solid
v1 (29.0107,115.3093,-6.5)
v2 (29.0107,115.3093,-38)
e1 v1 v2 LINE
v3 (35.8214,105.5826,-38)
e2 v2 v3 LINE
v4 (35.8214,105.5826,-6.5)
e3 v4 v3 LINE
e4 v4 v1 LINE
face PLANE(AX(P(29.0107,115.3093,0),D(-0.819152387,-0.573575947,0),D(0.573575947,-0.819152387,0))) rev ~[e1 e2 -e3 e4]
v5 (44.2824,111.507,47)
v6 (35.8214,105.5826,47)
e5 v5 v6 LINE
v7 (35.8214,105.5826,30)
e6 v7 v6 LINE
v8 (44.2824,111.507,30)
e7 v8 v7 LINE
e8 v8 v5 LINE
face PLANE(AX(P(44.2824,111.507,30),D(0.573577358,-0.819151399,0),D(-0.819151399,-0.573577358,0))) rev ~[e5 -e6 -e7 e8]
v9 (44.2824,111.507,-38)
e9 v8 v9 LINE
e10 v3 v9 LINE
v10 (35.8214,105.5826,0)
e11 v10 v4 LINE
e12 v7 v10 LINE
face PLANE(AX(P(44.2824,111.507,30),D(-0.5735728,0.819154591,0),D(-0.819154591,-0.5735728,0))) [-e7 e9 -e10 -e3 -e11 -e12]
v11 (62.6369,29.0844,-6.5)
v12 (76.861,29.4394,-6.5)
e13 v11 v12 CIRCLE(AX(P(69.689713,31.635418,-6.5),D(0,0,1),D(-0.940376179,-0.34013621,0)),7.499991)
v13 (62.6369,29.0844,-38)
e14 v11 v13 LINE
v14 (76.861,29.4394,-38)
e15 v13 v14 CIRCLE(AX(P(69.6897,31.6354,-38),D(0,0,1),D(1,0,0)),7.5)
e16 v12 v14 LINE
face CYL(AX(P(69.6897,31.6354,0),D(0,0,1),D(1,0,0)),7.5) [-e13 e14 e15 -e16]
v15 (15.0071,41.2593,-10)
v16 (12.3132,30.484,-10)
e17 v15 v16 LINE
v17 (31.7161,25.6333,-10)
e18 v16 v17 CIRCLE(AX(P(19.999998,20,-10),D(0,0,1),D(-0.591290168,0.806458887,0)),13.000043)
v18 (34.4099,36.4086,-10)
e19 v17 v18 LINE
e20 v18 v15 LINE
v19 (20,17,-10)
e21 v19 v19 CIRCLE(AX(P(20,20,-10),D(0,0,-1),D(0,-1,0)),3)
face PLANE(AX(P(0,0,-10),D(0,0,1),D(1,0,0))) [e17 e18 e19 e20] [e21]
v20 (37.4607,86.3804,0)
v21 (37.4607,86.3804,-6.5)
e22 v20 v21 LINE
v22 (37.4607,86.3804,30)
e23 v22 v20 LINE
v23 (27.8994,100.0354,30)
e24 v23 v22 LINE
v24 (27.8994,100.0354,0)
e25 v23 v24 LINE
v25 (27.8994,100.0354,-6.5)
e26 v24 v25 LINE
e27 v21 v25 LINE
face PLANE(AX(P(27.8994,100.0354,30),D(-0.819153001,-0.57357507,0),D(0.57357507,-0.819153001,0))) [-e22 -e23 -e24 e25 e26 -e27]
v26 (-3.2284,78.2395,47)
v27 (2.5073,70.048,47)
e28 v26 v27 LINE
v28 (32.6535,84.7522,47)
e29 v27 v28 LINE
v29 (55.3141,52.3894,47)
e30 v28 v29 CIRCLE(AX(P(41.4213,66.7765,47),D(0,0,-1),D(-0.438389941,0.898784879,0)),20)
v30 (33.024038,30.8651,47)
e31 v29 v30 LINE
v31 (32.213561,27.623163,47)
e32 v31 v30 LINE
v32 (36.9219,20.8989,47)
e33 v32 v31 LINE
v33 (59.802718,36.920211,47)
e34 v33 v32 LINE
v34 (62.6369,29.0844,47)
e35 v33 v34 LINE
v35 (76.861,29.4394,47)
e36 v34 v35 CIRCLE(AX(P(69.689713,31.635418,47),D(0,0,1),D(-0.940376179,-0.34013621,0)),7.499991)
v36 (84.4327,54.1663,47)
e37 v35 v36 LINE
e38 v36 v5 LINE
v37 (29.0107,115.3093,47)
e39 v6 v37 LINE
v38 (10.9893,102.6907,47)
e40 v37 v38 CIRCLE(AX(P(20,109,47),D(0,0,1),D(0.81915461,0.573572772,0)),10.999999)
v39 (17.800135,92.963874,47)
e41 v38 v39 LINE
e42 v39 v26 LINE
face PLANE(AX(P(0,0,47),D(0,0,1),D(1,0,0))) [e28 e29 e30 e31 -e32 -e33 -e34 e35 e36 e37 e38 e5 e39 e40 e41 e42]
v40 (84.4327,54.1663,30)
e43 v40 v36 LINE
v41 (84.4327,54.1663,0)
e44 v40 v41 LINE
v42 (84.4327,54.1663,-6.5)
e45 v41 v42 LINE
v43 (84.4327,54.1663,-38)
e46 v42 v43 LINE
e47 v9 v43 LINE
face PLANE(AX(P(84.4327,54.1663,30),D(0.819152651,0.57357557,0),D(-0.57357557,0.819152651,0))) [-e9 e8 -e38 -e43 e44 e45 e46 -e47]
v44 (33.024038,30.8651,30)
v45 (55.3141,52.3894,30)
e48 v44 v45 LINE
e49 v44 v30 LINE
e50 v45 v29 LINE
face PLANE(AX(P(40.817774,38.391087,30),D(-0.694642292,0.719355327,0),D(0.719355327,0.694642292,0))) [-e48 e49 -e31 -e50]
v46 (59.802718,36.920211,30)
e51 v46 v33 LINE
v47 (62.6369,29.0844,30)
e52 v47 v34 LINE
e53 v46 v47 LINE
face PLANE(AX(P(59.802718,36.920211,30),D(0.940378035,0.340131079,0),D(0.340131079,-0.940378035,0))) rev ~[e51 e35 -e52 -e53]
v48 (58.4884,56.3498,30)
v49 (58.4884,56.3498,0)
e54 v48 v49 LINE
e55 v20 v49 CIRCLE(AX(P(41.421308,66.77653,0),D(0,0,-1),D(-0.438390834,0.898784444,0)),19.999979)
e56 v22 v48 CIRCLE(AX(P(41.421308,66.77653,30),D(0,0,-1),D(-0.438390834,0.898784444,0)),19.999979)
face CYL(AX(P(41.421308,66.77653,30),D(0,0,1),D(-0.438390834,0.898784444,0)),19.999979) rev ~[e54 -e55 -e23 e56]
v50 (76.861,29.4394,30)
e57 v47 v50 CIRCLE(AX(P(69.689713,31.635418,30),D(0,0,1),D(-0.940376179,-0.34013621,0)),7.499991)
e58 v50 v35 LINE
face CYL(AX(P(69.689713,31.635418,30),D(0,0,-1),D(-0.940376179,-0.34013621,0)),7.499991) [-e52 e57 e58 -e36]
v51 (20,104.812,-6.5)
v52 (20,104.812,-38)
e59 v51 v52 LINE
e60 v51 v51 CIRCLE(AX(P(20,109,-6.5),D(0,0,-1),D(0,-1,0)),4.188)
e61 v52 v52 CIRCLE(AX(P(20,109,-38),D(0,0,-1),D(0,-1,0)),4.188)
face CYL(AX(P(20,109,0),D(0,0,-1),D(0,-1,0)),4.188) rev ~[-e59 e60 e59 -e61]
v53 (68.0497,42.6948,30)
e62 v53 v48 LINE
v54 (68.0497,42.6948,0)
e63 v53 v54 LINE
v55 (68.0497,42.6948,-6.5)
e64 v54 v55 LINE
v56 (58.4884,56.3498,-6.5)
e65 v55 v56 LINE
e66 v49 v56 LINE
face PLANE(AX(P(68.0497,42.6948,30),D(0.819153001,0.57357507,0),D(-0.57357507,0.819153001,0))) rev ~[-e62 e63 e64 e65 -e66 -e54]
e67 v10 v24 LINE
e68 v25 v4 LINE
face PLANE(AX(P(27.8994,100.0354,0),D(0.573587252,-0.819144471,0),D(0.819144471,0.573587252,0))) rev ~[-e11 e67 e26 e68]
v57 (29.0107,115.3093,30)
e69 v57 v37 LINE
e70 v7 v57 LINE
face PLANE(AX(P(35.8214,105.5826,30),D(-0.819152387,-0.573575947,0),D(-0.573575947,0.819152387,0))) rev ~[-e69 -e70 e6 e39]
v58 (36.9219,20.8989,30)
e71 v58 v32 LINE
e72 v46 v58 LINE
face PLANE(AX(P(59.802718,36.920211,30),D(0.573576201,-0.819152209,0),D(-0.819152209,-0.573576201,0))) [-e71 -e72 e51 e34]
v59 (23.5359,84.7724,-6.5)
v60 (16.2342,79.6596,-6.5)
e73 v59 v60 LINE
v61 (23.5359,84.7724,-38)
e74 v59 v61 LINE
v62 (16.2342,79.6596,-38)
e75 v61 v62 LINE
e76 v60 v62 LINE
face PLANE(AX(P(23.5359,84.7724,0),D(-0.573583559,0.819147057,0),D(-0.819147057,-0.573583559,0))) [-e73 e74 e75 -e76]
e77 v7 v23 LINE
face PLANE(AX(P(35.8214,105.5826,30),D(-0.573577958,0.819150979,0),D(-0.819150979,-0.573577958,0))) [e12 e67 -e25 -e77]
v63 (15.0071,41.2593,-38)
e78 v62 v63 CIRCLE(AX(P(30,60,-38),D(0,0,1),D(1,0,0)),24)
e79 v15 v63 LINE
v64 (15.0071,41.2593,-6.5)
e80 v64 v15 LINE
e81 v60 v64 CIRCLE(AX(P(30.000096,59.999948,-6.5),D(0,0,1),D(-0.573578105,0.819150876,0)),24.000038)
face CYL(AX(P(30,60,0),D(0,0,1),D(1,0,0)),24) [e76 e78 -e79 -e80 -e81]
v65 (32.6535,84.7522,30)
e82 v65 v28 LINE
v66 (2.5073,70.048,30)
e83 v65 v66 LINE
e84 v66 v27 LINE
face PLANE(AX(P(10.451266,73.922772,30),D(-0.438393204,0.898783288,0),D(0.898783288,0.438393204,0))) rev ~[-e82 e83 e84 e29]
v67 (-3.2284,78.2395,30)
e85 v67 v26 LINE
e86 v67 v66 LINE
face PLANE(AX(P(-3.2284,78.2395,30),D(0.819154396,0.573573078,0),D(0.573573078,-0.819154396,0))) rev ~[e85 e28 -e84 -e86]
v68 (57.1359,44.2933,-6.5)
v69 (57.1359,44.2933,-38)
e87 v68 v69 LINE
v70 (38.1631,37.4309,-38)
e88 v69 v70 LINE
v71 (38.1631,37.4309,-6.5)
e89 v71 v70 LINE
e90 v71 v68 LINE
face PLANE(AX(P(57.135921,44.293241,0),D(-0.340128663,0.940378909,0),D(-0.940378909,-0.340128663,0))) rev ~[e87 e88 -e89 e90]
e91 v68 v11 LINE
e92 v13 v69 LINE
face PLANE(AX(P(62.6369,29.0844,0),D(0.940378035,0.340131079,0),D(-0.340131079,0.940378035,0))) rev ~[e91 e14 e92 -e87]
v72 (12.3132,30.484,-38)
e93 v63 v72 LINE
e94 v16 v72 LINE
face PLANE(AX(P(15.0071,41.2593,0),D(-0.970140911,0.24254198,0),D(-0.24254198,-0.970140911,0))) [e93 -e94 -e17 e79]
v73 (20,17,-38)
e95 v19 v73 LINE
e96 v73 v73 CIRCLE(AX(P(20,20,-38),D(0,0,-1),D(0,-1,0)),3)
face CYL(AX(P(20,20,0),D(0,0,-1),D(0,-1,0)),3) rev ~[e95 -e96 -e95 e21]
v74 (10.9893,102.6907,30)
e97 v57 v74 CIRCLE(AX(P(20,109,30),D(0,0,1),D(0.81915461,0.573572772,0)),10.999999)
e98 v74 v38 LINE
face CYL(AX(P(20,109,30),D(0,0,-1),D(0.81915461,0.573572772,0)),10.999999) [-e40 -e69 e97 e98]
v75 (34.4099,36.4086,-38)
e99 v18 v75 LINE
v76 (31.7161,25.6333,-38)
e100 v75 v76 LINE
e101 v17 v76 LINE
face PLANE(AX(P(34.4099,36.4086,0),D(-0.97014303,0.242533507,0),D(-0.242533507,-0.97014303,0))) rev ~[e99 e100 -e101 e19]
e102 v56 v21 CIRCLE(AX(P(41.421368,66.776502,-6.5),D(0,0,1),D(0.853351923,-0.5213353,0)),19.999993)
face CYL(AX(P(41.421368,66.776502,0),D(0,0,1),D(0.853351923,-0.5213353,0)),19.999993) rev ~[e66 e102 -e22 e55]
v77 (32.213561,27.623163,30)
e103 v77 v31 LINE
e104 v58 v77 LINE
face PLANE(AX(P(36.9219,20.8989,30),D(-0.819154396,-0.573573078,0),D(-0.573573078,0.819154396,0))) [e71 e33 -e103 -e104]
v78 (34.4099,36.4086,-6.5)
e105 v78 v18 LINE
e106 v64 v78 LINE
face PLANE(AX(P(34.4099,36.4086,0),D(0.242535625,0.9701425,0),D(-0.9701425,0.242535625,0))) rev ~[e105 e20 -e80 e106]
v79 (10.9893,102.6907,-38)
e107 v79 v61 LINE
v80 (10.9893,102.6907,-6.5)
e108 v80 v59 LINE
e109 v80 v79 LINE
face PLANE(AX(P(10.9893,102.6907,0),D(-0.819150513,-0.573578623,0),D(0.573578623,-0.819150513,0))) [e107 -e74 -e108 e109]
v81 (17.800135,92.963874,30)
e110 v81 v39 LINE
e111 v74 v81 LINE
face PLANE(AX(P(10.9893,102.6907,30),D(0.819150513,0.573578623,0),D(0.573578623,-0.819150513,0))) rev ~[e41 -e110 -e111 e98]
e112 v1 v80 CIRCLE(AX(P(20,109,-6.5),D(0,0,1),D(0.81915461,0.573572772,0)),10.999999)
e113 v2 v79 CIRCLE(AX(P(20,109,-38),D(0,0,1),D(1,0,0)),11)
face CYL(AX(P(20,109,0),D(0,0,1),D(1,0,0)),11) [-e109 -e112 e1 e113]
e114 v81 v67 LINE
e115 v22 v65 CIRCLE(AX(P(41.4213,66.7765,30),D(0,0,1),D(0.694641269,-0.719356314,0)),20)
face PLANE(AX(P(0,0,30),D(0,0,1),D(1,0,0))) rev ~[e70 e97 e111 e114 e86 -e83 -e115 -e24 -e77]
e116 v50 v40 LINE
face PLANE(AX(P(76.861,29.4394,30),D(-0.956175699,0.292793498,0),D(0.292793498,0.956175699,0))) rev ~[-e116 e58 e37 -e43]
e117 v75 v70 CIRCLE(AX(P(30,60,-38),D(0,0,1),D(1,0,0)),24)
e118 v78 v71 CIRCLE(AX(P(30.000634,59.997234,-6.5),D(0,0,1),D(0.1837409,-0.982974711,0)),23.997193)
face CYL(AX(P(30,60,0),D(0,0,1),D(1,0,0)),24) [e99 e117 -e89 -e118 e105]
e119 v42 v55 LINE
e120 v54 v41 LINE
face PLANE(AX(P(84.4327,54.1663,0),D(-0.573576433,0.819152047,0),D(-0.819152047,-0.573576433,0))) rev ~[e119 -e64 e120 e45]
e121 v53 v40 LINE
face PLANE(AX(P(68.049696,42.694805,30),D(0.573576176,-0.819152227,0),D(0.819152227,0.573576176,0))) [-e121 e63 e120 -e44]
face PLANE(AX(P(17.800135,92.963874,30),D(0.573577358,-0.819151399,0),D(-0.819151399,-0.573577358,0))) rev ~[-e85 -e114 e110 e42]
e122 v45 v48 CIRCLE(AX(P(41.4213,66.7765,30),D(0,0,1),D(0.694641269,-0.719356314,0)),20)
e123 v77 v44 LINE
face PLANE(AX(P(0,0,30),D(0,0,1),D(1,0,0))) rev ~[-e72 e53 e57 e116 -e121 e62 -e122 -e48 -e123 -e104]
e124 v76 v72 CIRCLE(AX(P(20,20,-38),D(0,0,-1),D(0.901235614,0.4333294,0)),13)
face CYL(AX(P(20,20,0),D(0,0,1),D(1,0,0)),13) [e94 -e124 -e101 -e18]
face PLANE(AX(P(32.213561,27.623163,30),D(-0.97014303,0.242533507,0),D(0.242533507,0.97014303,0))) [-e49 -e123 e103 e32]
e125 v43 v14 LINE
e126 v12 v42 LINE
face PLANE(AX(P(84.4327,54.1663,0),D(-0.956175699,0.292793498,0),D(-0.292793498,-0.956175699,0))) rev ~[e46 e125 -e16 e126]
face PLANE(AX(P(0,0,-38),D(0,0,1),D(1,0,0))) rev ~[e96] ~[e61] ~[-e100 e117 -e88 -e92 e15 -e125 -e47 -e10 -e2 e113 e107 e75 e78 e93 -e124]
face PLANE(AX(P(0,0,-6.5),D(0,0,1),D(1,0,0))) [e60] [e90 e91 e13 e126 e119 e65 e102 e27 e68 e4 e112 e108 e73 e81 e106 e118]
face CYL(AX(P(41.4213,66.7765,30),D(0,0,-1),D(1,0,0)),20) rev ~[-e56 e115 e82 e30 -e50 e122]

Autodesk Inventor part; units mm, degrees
ref_plane "YZ Plane" through (0, 0, 0) normal (1, 0, 0) x (0, 1, 0)
ref_plane "XZ Plane" through (0, 0, 0) normal (0, 1, 0) x (-1, 0, 0)
sketch "Sketch1" plane through (0, 0, 0) normal (0, 0, 1) x (1, 0, 0)
  circle A0 centre (20, 109) radius 11
  circle A1 centre (20, 20) radius 13
  line L0 (20, 109) -> (20, 20) construction
  line L1 (0, 144) -> (0, -24) construction
  line L2 (-16.8865, 0) -> (101.3193, 0) construction
  circle A2 centre (30, 60) radius 24
  line L3 (23.5359, 84.7724) -> (16.2342, 79.6596)
  line L4 (10.9893, 102.6907) -> (23.5359, 84.7724)
  line L5 (30, 60) -> (20, 20) construction
  line L6 (15.0071, 41.2593) -> (12.3132, 30.484)
  line L7 (34.4099, 36.4086) -> (31.7161, 25.6333)
  line L8 (29.0107, 115.3093) -> (35.8214, 105.5826)
  line L9 (35.8214, 105.5826) -> (44.2824, 111.507)
  line L10 (44.2824, 111.507) -> (84.4327, 54.1663)
  line L11 (84.4327, 54.1663) -> (38.1631, 37.4309)
  circle A3 centre (69.6897, 31.6354) radius 7.5
  line L12 (84.4327, 54.1663) -> (76.861, 29.4394)
  line L13 (62.6369, 29.0844) -> (57.1359, 44.2933)
  point P0 (0, 0)
  dimension "d0" = 89
  dimension "d2" = 48
  dimension "d3" = 20
  dimension "d4" = 20
  dimension "d5" = 26
  dimension "d6" = 22
  dimension "d7" = 40
  dimension "d8" = 10
  dimension "d9" = 35
  dimension "d10" = 20
  dimension "d11" = 10
  dimension "d13" = 10.3289
  dimension "d14" = 70
  dimension "d15" = 25
  dimension "d17" = 80
  dimension "d18" = 15
extrude "Extrusion1" add sketch "Sketch1" against normal blind 38
ref_plane "Work Plane1" through (0, 0, 30) normal (0, 0, 1) x (1, 0, 0)
sketch "Sketch2" plane through (0, 0, 30) normal (0, 0, 1) x (1, 0, 0)
  line L0 (10.9893, 102.6907) -> (23.5359, 84.7724) projected
  line L1 (23.5359, 84.7724) -> (16.2342, 79.6596) projected
  arc A0 (16.2342, 79.6596) -> (15.0071, 41.2593) centre (30, 60) ccw projected
  line L2 (15.0071, 41.2593) -> (12.3132, 30.484) projected
  arc A1 (12.3132, 30.484) -> (31.7161, 25.6333) centre (20, 20) ccw projected
  line L3 (31.7161, 25.6333) -> (34.4099, 36.4086) projected
  arc A2 (34.4099, 36.4086) -> (38.1631, 37.4309) centre (30, 60) ccw projected
  line L4 (38.1631, 37.4309) -> (57.1359, 44.2933) projected
  line L5 (57.1359, 44.2933) -> (62.6369, 29.0844) projected
  arc A3 (62.6369, 29.0844) -> (76.861, 29.4394) centre (69.6897, 31.6354) ccw projected
  line L6 (76.861, 29.4394) -> (84.4327, 54.1663) projected
  line L7 (84.4327, 54.1663) -> (44.2824, 111.507) projected
  arc A4 (29.0107, 115.3093) -> (10.9893, 102.6907) centre (20, 109) ccw projected
  line L8 (84.4327, 54.1663) -> (36.9219, 20.8989)
  line L9 (44.2824, 111.507) -> (-3.2284, 78.2395)
  line L10 (35.8214, 105.5826) -> (29.0107, 115.3093) projected
  line L11 (-3.2284, 78.2395) -> (2.5073, 70.048)
  line L12 (36.9219, 20.8989) -> (31.1862, 29.0904)
  line L13 (2.5073, 70.048) -> (31.1862, 29.0904) construction
  circle A5 centre (41.4213, 66.7765) radius 20
  line L14 (41.4213, 66.7765) -> (16.8468, 49.5692) construction
  line L15 (2.5073, 70.048) -> (32.6535, 84.7522)
  line L16 (31.1862, 29.0904) -> (55.3141, 52.3894)
  point P0 (0, 0)
  point P1 (17.8001, 92.9639)
  point P2 (33.0241, 30.8652)
  point P3 (32.2136, 27.6232)
  point P4 (59.8027, 36.9202)
  dimension "d23" = 58
  dimension "d27" = 10
  dimension "d28" = 30
  dimension "d29" = 40
extrude "Extrusion2" add sketch "Sketch2" along normal blind 17 contours A4 L10 L9 L0 | L9 L7 L8 L5 L4 L16 A5 L15 A0 L1 L0 | L0 L1 A0 L15 L11 L9 | L6 A3 L5 L8 | L8 L12 L3 L16 L4 L5
sketch "Sketch3" plane through (0, 0, 30) normal (0, 0, -1) x (-1, 0, 0)
  line L0 (-10.9893, 102.6907) -> (-17.8001, 92.9639) projected
  arc A0 (-10.9893, 102.6907) -> (-29.0107, 115.3093) centre (-20, 109) ccw projected
  line L1 (-35.8214, 105.5826) -> (-29.0107, 115.3093) projected
  line L2 (-44.2824, 111.507) -> (-35.8214, 105.5826) projected
  line L3 (-84.4327, 54.1663) -> (-44.2824, 111.507) projected
  line L4 (-76.861, 29.4394) -> (-84.4327, 54.1663) projected
  arc A1 (-76.861, 29.4394) -> (-62.6369, 29.0844) centre (-69.6897, 31.6354) ccw projected
  line L5 (-59.8027, 36.9202) -> (-62.6369, 29.0844) projected
  line L6 (-36.9219, 20.8989) -> (-59.8027, 36.9202) projected
  line L7 (-32.2136, 27.6232) -> (-36.9219, 20.8989) projected
  line L8 (-33.0241, 30.8652) -> (-32.2136, 27.6232) projected
  line L9 (-55.3141, 52.3894) -> (-33.0241, 30.8652) projected
  arc A2 (-32.6535, 84.7522) -> (-55.3141, 52.3894) centre (-41.4213, 66.7765) ccw projected
  line L10 (-2.5073, 70.048) -> (-32.6535, 84.7522) projected
  line L11 (3.2284, 78.2395) -> (-2.5073, 70.048) projected
  line L12 (-17.8001, 92.9639) -> (3.2284, 78.2395) projected
  line L13 (-59.8027, 36.9202) -> (-84.4327, 54.1663)
  line L14 (-35.8214, 105.5826) -> (-17.8001, 92.9639)
  line L15 (-27.8994, 100.0354) -> (-37.4607, 86.3804)
  line L16 (-84.4327, 54.1663) -> (-44.2824, 111.507) projected
  line L17 (-68.0497, 42.6948) -> (-58.4884, 56.3498)
  line L18 (-32.493, 93.475) -> (-48.8761, 104.9465) construction
  line L19 (-63.269, 49.5223) -> (-79.6521, 60.9938) construction
  point P0 (0, 0)
  dimension "d52" = 20
extrude "Extrusion3" add sketch "Sketch3" along normal up to surface (30 mm away) contours L15 A2 L17 L13 L3 L2 L14
sketch "Sketch4" plane through (0, 0, 0) normal (0, 0, 1) x (1, 0, 0)
  arc A0 (29.0107, 115.3093) -> (10.9893, 102.6907) centre (20, 109) ccw projected
  point P0 (0, 0)
hole "Hole1" at (20, 109, 0) direction (0, 0, -1) diameter 8.376 end through all thread size "M10x1.5" class "6H" standard "ANSI Metric M Profile"
sketch "Sketch5" plane through (0, 0, 0) normal (0, 0, 1) x (1, 0, 0)
  arc A0 (12.3132, 30.484) -> (31.7161, 25.6333) centre (20, 20) ccw projected
  point P0 (0, 0)
hole "Hole2" at (20, 20, 0) direction (0, 0, -1) diameter 6 end through all
sketch "Sketch6" plane through (0, 0, 0) normal (0, 0, 1) x (1, 0, 0)
  circle A0 centre (20, 20) radius 3 projected
  circle A1 centre (20, 109) radius 4.188 projected
  arc A2 (58.4884, 56.3498) -> (37.4607, 86.3804) centre (41.4213, 66.7765) ccw projected
  line L0 (27.8994, 100.0354) -> (35.8214, 105.5826) projected
  line L1 (35.8214, 105.5826) -> (29.0107, 115.3093) projected
  arc A3 (29.0107, 115.3093) -> (10.9893, 102.6907) centre (20, 109) ccw projected
  line L2 (10.9893, 102.6907) -> (23.5359, 84.7724) projected
  arc A4 (16.2342, 79.6596) -> (15.0071, 41.2593) centre (30, 60) ccw projected
  line L3 (15.0071, 41.2593) -> (12.3132, 30.484) projected
  arc A5 (12.3132, 30.484) -> (31.7161, 25.6333) centre (20, 20) ccw projected
  line L4 (31.7161, 25.6333) -> (34.4099, 36.4086) projected
  arc A6 (34.4099, 36.4086) -> (38.1631, 37.4309) centre (30, 60) ccw projected
  line L5 (38.1631, 37.4309) -> (57.1359, 44.2933) projected
  line L6 (34.4099, 36.4086) -> (15.0071, 41.2593)
  line L7 (84.4327, 54.1663) -> (68.0497, 42.6948) projected
  line L8 (68.0497, 42.6948) -> (58.4884, 56.3498) projected
  line L9 (37.4607, 86.3804) -> (27.8994, 100.0354) projected
  line L10 (23.5359, 84.7724) -> (16.2342, 79.6596) projected
  line L11 (57.1359, 44.2933) -> (62.6369, 29.0844) projected
  arc A7 (62.6369, 29.0844) -> (76.861, 29.4394) centre (69.6897, 31.6354) ccw projected
  line L12 (76.861, 29.4394) -> (84.4327, 54.1663) projected
  point P0 (0, 0)
extrude "Extrusion4" cut sketch "Sketch6" against normal blind 10 contours L4 A5 L3 L6
sketch "Sketch7" plane through (0, 0, 0) normal (0, 0, 1) x (1, 0, 0)
  line L0 (15.0071, 41.2593) -> (34.4099, 36.4086) projected
  arc A0 (34.4099, 36.4086) -> (38.1631, 37.4309) centre (30, 60) ccw projected
  line L1 (38.1631, 37.4309) -> (57.1359, 44.2933) projected
  arc A1 (58.4884, 56.3498) -> (37.4607, 86.3804) centre (41.4213, 66.7765) ccw projected
  line L2 (27.8994, 100.0354) -> (35.8214, 105.5826) projected
  line L3 (35.8214, 105.5826) -> (29.0107, 115.3093) projected
  arc A2 (29.0107, 115.3093) -> (10.9893, 102.6907) centre (20, 109) ccw projected
  line L4 (10.9893, 102.6907) -> (23.5359, 84.7724) projected
  arc A3 (16.2342, 79.6596) -> (15.0071, 41.2593) centre (30, 60) ccw projected
  circle A4 centre (20, 109) radius 4.188 projected
  line L5 (19.6524, 94.2609) -> (17.2626, 93.7315)
  line L6 (57.1359, 44.2933) -> (62.6369, 29.0844) projected
  arc A5 (62.6369, 29.0844) -> (76.861, 29.4394) centre (69.6897, 31.6354) ccw projected
  line L7 (76.861, 29.4394) -> (84.4327, 54.1663) projected
  line L8 (84.4327, 54.1663) -> (68.0497, 42.6948) projected
  line L9 (68.0497, 42.6948) -> (58.4884, 56.3498) projected
  line L10 (37.4607, 86.3804) -> (27.8994, 100.0354) projected
  line L11 (23.5359, 84.7724) -> (16.2342, 79.6596) projected
  point P0 (0, 0)
extrude "Extrusion5" cut sketch "Sketch7" against normal blind 6.5
properties part number "F3_Rough_Rear_Caliper_V2"
